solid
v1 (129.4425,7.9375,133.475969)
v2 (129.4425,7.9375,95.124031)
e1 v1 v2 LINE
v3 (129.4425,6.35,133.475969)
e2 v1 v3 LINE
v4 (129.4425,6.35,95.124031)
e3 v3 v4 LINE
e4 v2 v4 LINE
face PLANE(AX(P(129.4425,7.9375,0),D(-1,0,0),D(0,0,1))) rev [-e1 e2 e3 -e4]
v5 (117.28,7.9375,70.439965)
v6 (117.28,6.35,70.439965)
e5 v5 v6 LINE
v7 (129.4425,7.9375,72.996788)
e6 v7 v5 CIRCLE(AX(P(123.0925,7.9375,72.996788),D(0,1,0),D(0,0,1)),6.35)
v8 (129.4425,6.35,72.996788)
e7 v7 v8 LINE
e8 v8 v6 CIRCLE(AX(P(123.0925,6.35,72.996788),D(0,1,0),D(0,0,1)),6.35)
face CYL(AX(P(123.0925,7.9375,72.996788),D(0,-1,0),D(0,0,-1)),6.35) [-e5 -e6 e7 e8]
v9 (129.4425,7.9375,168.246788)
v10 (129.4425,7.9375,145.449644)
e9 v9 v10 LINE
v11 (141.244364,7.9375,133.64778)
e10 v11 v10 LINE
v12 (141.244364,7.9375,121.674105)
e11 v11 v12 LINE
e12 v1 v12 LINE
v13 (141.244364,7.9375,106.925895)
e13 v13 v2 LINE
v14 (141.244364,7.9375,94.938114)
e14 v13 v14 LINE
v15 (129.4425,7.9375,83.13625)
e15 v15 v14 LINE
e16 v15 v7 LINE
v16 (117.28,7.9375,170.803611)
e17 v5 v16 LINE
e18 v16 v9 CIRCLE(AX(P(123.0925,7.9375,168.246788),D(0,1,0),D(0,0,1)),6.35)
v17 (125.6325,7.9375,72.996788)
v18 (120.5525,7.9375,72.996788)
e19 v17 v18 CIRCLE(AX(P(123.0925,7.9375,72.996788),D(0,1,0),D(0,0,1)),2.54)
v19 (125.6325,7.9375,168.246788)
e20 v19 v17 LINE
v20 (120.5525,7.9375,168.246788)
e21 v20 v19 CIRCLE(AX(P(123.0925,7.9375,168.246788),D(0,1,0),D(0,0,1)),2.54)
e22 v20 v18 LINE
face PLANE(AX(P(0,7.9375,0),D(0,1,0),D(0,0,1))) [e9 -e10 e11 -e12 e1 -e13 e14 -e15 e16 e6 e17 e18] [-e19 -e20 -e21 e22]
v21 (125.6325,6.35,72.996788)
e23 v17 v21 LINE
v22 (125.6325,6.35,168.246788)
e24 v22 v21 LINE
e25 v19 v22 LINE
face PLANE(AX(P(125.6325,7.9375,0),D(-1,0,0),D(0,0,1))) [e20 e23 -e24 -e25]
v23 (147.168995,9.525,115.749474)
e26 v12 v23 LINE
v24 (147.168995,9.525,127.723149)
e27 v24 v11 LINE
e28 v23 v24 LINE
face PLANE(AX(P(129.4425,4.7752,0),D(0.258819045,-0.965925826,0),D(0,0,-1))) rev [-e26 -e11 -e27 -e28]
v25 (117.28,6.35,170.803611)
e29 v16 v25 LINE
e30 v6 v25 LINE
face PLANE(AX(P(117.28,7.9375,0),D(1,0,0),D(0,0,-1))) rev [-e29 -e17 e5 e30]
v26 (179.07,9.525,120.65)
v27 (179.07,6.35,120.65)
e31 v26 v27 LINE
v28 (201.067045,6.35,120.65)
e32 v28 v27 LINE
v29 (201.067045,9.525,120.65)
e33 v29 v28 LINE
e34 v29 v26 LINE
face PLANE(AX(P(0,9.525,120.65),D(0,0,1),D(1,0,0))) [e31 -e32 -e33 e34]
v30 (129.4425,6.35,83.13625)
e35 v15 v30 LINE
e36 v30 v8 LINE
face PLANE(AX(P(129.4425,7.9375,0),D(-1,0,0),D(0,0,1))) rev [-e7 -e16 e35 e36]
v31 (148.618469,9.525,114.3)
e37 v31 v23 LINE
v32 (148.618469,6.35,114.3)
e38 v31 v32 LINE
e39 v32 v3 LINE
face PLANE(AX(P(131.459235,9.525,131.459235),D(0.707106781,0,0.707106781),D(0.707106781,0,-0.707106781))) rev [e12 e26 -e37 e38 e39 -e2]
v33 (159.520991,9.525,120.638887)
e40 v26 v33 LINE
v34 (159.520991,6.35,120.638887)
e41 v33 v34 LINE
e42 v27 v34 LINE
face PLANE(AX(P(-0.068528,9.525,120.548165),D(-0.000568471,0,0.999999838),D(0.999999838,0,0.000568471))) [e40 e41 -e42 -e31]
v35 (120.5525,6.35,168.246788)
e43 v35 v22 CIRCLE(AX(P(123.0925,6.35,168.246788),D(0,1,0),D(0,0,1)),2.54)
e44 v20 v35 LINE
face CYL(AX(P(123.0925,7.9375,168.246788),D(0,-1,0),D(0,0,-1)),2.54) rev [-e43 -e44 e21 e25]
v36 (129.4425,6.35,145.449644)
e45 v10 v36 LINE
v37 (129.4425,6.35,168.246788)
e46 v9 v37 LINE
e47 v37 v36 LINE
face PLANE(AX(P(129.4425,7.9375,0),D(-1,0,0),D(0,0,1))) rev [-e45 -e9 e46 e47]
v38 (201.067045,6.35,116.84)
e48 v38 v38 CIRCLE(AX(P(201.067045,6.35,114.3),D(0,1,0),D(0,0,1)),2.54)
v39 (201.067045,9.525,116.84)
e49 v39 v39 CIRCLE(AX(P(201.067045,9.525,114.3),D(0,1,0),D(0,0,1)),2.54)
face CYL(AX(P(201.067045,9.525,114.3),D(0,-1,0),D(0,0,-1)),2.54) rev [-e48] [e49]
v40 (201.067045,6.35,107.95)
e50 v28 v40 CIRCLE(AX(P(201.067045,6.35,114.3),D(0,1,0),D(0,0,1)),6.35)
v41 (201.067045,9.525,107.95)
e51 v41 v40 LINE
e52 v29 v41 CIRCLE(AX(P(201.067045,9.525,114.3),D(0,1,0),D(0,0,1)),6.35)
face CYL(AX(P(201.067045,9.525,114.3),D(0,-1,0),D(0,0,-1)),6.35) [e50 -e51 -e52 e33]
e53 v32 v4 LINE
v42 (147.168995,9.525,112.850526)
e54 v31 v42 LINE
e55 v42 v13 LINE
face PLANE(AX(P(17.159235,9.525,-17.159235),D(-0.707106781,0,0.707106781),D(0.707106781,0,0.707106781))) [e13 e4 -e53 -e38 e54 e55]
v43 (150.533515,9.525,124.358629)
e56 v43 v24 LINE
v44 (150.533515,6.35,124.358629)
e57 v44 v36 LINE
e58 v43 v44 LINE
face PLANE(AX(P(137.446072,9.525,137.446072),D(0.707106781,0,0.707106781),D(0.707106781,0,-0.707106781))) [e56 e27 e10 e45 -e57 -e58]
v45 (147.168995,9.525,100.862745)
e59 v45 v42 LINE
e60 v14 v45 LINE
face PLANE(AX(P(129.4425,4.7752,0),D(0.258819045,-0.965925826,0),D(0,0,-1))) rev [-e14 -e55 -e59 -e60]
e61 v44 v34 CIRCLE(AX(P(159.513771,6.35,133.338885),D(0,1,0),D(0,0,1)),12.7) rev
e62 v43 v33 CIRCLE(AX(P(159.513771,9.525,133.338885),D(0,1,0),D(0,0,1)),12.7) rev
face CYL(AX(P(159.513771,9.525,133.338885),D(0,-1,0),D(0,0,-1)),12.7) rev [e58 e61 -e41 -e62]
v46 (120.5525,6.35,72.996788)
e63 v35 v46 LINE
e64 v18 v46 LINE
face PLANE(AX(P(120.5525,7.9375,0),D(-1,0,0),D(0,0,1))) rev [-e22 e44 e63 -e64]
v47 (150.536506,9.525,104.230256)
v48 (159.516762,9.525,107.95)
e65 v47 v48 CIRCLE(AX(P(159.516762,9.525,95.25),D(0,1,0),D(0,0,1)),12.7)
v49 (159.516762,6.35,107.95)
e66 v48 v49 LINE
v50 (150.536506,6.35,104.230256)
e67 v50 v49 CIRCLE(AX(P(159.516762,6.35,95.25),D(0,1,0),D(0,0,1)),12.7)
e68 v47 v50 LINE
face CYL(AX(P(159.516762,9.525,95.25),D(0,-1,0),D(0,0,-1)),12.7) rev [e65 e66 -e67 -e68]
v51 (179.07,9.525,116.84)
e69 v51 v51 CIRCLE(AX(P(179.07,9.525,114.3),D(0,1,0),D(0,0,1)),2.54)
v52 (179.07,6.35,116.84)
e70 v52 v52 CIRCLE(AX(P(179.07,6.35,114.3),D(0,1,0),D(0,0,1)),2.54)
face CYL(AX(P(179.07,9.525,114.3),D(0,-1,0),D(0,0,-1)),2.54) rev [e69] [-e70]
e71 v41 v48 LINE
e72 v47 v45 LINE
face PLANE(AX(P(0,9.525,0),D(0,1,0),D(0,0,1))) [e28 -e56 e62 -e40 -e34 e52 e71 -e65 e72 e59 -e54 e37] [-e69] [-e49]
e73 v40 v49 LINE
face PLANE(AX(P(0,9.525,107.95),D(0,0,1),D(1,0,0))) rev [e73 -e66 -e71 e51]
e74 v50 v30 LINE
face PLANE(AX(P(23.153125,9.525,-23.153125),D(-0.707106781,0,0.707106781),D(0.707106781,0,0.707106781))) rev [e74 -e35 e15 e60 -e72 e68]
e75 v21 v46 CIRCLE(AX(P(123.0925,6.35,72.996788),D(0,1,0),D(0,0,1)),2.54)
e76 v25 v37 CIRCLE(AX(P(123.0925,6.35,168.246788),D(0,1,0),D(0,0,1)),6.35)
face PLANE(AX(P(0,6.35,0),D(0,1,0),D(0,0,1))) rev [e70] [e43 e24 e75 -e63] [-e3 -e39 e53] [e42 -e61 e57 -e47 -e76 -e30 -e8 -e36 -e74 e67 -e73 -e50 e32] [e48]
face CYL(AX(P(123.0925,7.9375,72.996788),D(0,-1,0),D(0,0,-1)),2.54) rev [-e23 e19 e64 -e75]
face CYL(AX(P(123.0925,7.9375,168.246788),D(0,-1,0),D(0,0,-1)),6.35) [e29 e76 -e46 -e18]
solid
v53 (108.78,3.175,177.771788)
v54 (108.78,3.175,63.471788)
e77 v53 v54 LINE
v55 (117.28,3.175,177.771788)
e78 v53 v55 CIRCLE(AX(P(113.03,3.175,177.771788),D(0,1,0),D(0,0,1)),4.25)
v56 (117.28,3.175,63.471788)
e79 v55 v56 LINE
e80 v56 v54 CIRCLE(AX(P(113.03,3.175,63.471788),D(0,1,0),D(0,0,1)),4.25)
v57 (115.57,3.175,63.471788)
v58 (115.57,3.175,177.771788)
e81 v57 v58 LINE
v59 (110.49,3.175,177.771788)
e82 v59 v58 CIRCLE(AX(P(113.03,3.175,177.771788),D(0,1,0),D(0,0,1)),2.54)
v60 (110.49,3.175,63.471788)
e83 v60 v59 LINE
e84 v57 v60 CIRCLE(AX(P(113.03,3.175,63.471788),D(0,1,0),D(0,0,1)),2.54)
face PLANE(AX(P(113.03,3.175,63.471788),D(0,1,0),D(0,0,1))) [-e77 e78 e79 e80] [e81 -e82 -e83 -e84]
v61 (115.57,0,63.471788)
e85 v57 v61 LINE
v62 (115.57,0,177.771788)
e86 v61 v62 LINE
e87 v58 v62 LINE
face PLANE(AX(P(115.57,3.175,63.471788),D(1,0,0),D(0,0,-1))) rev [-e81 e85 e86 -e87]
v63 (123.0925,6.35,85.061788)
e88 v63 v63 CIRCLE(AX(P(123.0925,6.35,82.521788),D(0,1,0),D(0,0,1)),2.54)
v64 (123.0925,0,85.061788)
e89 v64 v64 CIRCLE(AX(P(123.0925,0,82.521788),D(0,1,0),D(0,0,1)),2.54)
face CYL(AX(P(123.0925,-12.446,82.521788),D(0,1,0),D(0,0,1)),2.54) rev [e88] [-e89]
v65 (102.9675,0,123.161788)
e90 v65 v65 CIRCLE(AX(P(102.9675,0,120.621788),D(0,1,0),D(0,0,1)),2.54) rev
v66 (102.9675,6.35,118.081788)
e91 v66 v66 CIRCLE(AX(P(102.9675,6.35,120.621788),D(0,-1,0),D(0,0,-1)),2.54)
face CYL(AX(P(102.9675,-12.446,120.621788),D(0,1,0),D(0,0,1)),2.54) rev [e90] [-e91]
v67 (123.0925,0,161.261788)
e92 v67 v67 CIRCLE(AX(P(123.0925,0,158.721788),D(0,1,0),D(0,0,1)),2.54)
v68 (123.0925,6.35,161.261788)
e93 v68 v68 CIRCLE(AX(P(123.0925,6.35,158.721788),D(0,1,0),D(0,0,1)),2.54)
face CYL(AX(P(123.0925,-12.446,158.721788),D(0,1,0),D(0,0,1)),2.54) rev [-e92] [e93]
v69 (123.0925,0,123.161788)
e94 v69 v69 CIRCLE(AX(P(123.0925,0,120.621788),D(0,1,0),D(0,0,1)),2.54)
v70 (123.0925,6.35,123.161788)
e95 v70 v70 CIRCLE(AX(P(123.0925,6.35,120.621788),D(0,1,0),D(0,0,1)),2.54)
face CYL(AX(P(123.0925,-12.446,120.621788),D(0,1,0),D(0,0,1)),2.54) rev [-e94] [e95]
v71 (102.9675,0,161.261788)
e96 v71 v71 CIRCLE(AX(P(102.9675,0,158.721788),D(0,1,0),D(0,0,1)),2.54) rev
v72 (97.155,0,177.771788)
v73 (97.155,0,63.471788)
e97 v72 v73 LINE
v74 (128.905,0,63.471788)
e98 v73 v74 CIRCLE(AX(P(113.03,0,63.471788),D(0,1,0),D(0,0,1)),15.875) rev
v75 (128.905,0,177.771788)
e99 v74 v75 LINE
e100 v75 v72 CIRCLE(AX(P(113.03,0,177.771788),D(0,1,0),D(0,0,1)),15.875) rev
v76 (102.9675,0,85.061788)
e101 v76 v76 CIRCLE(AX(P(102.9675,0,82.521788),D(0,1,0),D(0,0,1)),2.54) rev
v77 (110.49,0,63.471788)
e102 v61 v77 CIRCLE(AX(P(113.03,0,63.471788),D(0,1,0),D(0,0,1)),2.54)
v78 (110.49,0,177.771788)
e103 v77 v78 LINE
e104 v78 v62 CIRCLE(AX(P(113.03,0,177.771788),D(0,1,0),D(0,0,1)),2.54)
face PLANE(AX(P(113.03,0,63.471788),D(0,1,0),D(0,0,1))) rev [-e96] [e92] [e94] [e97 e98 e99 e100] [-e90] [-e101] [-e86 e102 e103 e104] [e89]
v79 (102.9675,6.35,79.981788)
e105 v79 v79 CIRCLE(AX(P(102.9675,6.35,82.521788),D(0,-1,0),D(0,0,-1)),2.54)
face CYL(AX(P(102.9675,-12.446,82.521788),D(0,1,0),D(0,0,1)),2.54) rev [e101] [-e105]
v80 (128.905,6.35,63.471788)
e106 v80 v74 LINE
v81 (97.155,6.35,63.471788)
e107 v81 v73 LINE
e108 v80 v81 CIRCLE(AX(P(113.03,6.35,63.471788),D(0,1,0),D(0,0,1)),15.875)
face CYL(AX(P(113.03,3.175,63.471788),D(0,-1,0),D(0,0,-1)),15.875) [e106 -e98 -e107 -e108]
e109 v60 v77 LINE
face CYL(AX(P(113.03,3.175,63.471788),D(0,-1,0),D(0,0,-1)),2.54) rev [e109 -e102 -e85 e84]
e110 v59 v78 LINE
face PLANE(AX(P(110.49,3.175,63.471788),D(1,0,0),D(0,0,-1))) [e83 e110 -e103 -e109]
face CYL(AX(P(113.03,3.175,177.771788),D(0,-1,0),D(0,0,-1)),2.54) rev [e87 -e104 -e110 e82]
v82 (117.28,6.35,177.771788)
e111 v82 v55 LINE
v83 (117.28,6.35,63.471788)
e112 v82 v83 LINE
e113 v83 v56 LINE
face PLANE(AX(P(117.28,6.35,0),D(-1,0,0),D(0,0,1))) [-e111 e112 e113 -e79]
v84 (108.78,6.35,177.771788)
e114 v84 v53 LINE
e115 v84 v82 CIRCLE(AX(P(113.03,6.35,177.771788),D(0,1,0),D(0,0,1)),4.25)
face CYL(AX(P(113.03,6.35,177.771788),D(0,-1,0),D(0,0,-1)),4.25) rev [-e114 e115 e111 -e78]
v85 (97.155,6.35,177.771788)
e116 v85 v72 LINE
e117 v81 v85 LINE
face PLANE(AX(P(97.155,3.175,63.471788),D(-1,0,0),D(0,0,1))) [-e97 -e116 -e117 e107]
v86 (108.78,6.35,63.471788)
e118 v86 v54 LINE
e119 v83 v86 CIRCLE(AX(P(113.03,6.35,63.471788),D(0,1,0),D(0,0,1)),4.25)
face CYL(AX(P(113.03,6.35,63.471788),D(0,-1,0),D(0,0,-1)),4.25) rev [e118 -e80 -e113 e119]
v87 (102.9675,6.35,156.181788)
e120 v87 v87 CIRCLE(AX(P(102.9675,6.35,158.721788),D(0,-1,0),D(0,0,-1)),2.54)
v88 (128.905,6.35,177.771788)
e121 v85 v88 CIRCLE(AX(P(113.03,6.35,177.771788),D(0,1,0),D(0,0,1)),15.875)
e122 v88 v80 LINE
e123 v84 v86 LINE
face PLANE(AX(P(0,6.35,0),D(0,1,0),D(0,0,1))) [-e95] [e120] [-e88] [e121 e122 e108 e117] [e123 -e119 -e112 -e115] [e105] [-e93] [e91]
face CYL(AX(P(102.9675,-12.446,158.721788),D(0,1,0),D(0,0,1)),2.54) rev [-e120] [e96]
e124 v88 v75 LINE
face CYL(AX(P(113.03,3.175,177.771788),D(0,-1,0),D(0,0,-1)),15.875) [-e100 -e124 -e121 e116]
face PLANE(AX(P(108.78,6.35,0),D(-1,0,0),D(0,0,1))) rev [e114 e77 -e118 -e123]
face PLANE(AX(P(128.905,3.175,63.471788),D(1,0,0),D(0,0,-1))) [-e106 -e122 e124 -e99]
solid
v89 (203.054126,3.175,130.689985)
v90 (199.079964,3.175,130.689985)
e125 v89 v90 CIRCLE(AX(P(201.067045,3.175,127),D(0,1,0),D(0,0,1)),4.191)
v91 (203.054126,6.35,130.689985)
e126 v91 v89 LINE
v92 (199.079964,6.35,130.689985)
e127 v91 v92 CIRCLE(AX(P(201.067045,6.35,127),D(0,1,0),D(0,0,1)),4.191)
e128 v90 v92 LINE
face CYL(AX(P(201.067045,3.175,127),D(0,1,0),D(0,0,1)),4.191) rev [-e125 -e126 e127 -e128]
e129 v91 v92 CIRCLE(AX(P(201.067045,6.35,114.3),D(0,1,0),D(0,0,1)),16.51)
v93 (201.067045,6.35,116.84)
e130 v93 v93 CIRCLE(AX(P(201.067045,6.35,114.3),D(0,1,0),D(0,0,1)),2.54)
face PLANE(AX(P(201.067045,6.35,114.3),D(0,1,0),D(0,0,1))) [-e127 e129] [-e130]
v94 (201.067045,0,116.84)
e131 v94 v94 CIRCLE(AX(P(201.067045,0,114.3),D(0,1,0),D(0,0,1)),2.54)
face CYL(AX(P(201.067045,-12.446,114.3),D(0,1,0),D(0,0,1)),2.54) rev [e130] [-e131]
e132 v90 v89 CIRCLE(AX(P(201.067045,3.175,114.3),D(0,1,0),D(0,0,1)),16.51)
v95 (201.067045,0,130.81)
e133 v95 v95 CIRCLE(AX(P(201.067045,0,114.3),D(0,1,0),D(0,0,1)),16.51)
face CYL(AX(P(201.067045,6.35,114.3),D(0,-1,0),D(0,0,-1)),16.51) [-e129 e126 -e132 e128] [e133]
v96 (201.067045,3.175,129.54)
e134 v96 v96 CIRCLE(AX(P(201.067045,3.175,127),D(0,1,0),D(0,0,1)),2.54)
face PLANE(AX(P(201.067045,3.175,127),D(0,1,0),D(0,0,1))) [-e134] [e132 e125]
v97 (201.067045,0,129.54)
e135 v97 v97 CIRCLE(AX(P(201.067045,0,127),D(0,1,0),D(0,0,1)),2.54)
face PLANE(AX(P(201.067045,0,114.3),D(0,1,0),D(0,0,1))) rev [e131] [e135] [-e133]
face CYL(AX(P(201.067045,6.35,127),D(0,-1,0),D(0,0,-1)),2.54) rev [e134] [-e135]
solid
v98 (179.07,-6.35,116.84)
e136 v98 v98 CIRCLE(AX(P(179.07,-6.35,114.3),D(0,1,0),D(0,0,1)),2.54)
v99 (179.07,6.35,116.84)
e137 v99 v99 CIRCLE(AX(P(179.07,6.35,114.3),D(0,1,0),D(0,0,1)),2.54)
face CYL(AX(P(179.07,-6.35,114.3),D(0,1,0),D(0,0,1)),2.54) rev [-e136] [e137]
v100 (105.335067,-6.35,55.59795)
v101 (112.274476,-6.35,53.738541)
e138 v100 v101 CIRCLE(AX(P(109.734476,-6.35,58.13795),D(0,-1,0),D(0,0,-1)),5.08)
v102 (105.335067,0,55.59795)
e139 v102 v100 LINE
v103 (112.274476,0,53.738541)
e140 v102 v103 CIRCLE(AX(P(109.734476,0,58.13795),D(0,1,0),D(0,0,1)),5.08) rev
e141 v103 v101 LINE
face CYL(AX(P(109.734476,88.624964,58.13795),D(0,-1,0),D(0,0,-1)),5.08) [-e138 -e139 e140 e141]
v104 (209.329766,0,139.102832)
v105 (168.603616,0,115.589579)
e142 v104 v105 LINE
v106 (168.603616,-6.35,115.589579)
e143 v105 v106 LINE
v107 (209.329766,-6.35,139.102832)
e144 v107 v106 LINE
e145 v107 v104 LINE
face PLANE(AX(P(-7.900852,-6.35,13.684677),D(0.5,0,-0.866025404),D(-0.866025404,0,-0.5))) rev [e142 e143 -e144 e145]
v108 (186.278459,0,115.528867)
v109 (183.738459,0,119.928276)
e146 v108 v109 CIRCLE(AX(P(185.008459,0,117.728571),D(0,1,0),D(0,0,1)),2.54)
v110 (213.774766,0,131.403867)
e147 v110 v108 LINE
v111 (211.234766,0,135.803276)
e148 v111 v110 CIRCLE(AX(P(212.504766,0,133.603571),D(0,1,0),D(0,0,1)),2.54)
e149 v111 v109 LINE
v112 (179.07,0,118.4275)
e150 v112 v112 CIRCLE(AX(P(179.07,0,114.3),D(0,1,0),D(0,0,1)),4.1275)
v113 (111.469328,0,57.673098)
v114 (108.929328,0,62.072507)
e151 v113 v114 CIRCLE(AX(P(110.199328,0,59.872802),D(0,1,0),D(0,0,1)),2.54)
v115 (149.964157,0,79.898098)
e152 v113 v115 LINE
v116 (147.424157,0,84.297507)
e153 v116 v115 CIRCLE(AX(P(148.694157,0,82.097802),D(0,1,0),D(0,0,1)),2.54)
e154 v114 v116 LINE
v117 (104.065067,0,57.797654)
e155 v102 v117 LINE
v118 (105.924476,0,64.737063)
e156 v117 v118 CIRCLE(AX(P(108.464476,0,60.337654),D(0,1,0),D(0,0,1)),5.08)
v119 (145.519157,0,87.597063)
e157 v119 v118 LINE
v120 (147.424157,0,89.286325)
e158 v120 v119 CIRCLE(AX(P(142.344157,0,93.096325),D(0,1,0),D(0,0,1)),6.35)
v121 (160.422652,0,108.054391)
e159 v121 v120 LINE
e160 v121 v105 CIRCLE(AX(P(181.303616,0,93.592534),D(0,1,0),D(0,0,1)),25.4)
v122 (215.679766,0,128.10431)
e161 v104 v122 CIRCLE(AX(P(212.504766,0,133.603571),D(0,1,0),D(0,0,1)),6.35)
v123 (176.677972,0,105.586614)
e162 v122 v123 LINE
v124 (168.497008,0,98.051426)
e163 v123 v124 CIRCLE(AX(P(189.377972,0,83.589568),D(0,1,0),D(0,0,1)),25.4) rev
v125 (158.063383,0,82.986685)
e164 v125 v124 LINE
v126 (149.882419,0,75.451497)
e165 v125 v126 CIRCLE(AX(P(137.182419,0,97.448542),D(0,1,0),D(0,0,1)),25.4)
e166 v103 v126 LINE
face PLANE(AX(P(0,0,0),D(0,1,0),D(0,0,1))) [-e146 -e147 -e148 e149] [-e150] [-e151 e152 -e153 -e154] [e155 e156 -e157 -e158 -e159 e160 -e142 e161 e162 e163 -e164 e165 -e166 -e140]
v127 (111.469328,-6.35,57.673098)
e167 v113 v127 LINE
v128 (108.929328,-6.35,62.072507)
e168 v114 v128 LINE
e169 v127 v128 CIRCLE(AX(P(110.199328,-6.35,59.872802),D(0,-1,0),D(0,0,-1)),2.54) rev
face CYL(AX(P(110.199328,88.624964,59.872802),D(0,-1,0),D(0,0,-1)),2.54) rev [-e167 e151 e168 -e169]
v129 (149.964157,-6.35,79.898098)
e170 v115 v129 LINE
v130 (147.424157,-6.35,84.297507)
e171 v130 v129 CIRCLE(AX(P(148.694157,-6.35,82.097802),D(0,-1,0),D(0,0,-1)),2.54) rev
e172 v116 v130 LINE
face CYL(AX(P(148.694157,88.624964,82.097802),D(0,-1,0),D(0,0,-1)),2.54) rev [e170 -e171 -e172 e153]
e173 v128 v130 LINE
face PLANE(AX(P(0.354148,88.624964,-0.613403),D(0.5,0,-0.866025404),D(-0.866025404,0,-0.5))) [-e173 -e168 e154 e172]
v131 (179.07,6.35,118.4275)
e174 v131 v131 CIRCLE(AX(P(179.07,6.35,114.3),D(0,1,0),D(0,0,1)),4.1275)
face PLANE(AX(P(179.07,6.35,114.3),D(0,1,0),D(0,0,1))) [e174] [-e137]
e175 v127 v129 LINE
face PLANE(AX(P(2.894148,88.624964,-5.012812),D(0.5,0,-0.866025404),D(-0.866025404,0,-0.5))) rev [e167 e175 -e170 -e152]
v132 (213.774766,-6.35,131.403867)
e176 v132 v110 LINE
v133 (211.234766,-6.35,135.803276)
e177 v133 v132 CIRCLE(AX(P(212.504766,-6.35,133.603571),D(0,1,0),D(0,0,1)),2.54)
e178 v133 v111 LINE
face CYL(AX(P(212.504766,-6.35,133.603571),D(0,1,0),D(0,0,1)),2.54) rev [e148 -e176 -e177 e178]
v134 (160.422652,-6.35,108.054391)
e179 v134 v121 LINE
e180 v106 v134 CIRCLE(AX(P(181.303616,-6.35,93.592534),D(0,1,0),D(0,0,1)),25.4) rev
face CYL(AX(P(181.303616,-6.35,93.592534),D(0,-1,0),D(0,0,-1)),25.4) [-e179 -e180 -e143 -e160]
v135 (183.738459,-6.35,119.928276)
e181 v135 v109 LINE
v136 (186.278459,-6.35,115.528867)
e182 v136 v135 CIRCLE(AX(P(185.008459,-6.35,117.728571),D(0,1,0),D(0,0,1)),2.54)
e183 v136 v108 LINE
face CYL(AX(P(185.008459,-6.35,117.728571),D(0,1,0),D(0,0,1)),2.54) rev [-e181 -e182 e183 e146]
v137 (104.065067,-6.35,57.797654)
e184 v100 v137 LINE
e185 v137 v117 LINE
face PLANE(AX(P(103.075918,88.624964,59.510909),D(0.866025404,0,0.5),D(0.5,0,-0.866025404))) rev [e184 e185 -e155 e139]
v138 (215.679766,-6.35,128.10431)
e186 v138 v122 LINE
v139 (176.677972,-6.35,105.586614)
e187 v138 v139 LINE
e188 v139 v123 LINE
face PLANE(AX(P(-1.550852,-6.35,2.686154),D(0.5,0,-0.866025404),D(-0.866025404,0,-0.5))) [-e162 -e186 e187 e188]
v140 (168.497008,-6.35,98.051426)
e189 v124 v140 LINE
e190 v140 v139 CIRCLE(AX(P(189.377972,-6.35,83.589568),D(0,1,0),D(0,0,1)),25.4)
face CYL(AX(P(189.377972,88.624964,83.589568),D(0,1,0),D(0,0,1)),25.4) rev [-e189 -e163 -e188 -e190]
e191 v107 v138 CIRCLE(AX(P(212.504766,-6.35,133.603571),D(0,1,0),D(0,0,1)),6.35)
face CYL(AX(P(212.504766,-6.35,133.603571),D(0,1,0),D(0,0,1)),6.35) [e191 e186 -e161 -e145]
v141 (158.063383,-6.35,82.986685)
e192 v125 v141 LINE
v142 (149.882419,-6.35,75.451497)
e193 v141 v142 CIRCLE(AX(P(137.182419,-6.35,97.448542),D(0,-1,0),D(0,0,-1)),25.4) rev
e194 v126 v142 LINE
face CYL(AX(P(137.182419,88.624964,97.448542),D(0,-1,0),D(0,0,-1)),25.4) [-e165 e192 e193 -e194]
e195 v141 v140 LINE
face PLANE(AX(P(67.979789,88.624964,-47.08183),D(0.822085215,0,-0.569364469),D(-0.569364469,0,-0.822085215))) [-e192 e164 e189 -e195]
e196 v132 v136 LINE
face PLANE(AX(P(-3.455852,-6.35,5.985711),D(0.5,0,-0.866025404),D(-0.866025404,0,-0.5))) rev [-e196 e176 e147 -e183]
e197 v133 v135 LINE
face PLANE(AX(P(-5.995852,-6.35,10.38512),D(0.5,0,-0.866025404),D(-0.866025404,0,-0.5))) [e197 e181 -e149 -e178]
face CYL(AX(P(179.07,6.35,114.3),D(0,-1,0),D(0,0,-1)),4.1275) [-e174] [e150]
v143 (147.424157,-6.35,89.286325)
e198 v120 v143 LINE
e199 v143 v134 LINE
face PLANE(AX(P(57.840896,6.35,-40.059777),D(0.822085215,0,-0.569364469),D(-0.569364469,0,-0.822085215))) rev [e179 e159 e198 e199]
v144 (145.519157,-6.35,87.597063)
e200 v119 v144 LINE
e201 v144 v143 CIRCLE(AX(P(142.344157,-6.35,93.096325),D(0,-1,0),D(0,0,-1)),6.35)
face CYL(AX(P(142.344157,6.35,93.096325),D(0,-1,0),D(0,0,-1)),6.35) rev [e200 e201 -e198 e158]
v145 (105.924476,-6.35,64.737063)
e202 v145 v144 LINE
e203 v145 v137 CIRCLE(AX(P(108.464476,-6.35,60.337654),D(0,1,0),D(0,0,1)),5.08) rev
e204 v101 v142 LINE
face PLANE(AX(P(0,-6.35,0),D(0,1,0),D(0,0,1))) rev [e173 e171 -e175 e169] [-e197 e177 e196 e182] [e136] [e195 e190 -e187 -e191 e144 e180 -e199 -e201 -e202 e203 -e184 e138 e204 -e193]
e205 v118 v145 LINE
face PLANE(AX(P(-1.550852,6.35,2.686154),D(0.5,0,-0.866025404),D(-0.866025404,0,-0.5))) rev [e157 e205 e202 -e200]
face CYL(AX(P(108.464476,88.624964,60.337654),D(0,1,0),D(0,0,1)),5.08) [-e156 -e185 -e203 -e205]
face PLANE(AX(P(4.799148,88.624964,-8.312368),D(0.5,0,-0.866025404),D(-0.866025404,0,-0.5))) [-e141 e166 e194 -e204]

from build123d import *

# Parameters (mm, degrees)
SKETCH8_R                = 16.51
SKETCH8_R_2              = 2.54
BOSS_EXTRUDE1_DEPTH      = 6.35
SKETCH8_3_R              = 2.54
BOSS_EXTRUDE2_DEPTH      = 6.35
BOSS_EXTRUDE3_DEPTH      = 3.175
BOSS_EXTRUDE5_DEPTH      = 6.35
CUT_EXTRUDE1_DEPTH       = 289.337970876
FILLET3_R                = 5.08
FILLET4_R                = 25.4
BOSS_EXTRUDE6_DEPTH      = 3.175
BOSS_EXTRUDE6_DEPTH_BACK = 3.175
BOSS_EXTRUDE7_DEPTH      = 3.175
CUT_EXTRUDE3_DEPTH       = 3.175
SKETCH16_R               = 4.1275
SKETCH16_R_2             = 2.54
BOSS_EXTRUDE8_DEPTH      = 6.35
SKETCH17_R               = 2.54
CUT_EXTRUDE4_DEPTH       = 18.796
SKETCH18_R               = 2.54
CUT_EXTRUDE5_DEPTH       = 18.796
BOSS_EXTRUDE9_OUTLINE_R  = 2.54
BOSS_EXTRUDE9_DEPTH      = 3.175
BOSS_EXTRUDE10_DEPTH     = 1.5875
CHAMFER3_SIZE            = 17.726494926
CHAMFER3_SIZE_2          = 4.7498
SKETCH20_R               = 4.191
CUT_EXTRUDE6_DEPTH       = 3.175


# Read off the part's stored shape, not the designer's step: Boss-Extrude9
with BuildPart() as part:
    # Sketch8 → Boss-Extrude1 (new body)
    with BuildSketch(Plane(origin=(0, 0, 0), x_dir=(1, 0, 0), z_dir=(0, 1, 0))):
        with Locations(Location((201.067045256, -114.3, 0), (0, 0, 270))):
            Circle(SKETCH8_R)
        with Locations(Location((201.067045256, -127, 0), (0, 0, 270))):
            Circle(SKETCH8_R_2, mode=Mode.SUBTRACT)
    extrude(amount=BOSS_EXTRUDE1_DEPTH)

    # Sketch17 → Cut-Extrude4 (cut)
    with BuildSketch(Plane(origin=(0, 6.35, 0), x_dir=(1, 0, 0), z_dir=(0, 1, 0))):
        with Locations(Location((201.067045256, -114.3, 0), (0, 0, 270))):
            Circle(SKETCH17_R)
    extrude(amount=-CUT_EXTRUDE4_DEPTH, mode=Mode.SUBTRACT)

    # Sketch20 → Cut-Extrude6 (cut)
    with BuildSketch(Plane(origin=(0, 6.35, 0), x_dir=(1, 0, 0), z_dir=(0, 1, 0))):
        with Locations((201.067045256, -127)):
            Circle(SKETCH20_R)
    extrude(amount=-CUT_EXTRUDE6_DEPTH, mode=Mode.SUBTRACT)


with BuildPart() as body_2:
    # Sketch8<3> → Boss-Extrude2 (new body)
    with BuildSketch(Plane(origin=(0, 0, 0), x_dir=(1, 0, 0), z_dir=(0, 1, 0))):
        with BuildLine():
            ThreePointArc((209.32976593, -139.102832424), (218.004027244, -136.77857111), (215.67976593, -128.104309796))
            Line((215.67976593, -128.104309796), (110.754602918, -67.525738686))
            ThreePointArc((110.754602918, -67.525738686), (102.080341604, -69.85), (104.404602918, -78.524261314))
            Line((104.404602918, -78.524261314), (209.32976593, -139.102832424))
        make_face()
        with BuildLine():
            ThreePointArc((213.77476593, -131.403866584), (214.704470456, -134.87357111), (211.23476593, -135.803275636))
            Line((211.23476593, -135.803275636), (183.73845936, -119.928275636))
            ThreePointArc((183.73845936, -119.928275636), (182.808754834, -116.45857111), (186.27845936, -115.528866584))
            Line((186.27845936, -115.528866584), (213.77476593, -131.403866584))
        make_face(mode=Mode.SUBTRACT)
        with Locations(Location((179.07, -114.3, 0), (0, 0, 270))):
            Circle(SKETCH8_3_R, mode=Mode.SUBTRACT)
    extrude(amount=-BOSS_EXTRUDE2_DEPTH)

    # Sketch9 → Boss-Extrude5 (add)
    with BuildSketch(Plane.XZ.offset(6.35)):
        with BuildLine():
            Line((158.063383303, 82.98668464), (171.74208472, 102.736877722))
            Line((171.74208472, 102.736877722), (110.754602918, 67.525738686))
            ThreePointArc((110.754602918, 67.525738686), (105.936101981, 66.891371003), (102.080341604, 69.85))
            Line((102.080341604, 69.85), (98.350066501, 67.696324666))
            Line((98.350066501, 67.696324666), (105.335066501, 55.597949775))
            ThreePointArc((105.335066501, 55.597949775), (108.419674804, 53.231046577), (112.274475553, 53.738540724))
            Line((112.274475553, 53.738540724), (149.882418833, 75.4514969))
            ThreePointArc((149.882418833, 75.4514969), (154.390412826, 78.765797637), (158.063383303, 82.98668464))
        make_face()
        with BuildLine():
            Line((108.929327815, 62.072506563), (147.424157014, 84.297506563))
            ThreePointArc((147.424157014, 84.297506563), (150.893861539, 83.367802038), (149.964157014, 79.898097512))
            Line((149.964157014, 79.898097512), (111.469327815, 57.673097512))
            ThreePointArc((111.469327815, 57.673097512), (107.99962329, 58.602802038), (108.929327815, 62.072506563))
        make_face(mode=Mode.SUBTRACT)
    extrude(amount=-BOSS_EXTRUDE5_DEPTH)

    # Sketch10 → Cut-Extrude1 (cut, through all)
    with BuildSketch(Plane.XZ.offset(6.35)):
        with BuildLine():
            Line((163.667728403, 112.739842766), (104.404602918, 78.524261314))
            ThreePointArc((104.404602918, 78.524261314), (101.445973921, 74.668500936), (102.080341604, 69.85))
            Line((102.080341604, 69.85), (98.350066501, 67.696324666))
            Line((98.350066501, 67.696324666), (101.525066501, 62.197063352))
            Line((101.525066501, 62.197063352), (145.519157014, 87.597063352))
            ThreePointArc((145.519157014, 87.597063352), (146.557191217, 88.345236074), (147.424157014, 89.286324666))
            Line((147.424157014, 89.286324666), (163.667728403, 112.739842766))
        make_face()
    extrude(amount=-CUT_EXTRUDE1_DEPTH, mode=Mode.SUBTRACT)

    # Fillet3
    fillet3_edges = [body_2.edges().sort_by_distance(p)[0] for p in [
        (101.525066501, -3.175, 62.197063352),
    ]]
    fillet(fillet3_edges, radius=FILLET3_R)

    # Fillet4
    fillet4_edges = [body_2.edges().sort_by_distance(p)[0] for p in [
        (163.667728403, -3.175, 112.739842766),
        (171.74208472, -3.175, 102.736877722),
    ]]
    fillet(fillet4_edges, radius=FILLET4_R)

    # Sketch16 → Boss-Extrude8 (add)
    with BuildSketch(Plane(origin=(0, 0, 0), x_dir=(1, 0, 0), z_dir=(0, 1, 0))):
        with Locations(Location((179.07, -114.3, 0), (0, 0, 270))):
            Circle(SKETCH16_R)
        with Locations(Location((179.07, -114.3, 0), (0, 0, 270))):
            Circle(SKETCH16_R_2, mode=Mode.SUBTRACT)
    extrude(amount=BOSS_EXTRUDE8_DEPTH)


with BuildPart() as body_3:
    # Sketch8<4> → Boss-Extrude3 (new body)
    with BuildSketch(Plane(origin=(0, 0, 0), x_dir=(1, 0, 0), z_dir=(0, 1, 0))):
        with BuildLine():
            Line((122.555, -63.471788223), (122.555, -177.771788223))
            ThreePointArc((122.555, -177.771788223), (113.03, -187.296788223), (103.505, -177.771788223))
            Line((103.505, -177.771788223), (103.505, -63.471788223))
            ThreePointArc((103.505, -63.471788223), (113.03, -53.946788223), (122.555, -63.471788223))
        make_face()
        with BuildLine():
            Line((115.57, -63.471788223), (115.57, -177.771788223))
            ThreePointArc((115.57, -177.771788223), (113.03, -180.311788223), (110.49, -177.771788223))
            Line((110.49, -177.771788223), (110.49, -63.471788223))
            ThreePointArc((110.49, -63.471788223), (113.03, -60.931788223), (115.57, -63.471788223))
        make_face(mode=Mode.SUBTRACT)
    extrude(amount=BOSS_EXTRUDE3_DEPTH)

    # Sketch12 → Boss-Extrude6 (add, two sides: drawn at the far end of the back side and taken through both)
    with BuildSketch(Plane.XZ.offset(-BOSS_EXTRUDE6_DEPTH_BACK)):
        with BuildLine():
            Line((97.155, 63.471788223), (97.155, 177.771788223))
            ThreePointArc((97.155, 177.771788223), (113.03, 193.646788223), (128.905, 177.771788223))
            Line((128.905, 177.771788223), (128.905, 63.471788223))
            ThreePointArc((128.905, 63.471788223), (113.03, 47.596788223), (97.155, 63.471788223))
        make_face()
        with BuildLine():
            Line((122.555, 63.471788223), (122.555, 177.771788223))
            ThreePointArc((122.555, 177.771788223), (113.03, 187.296788223), (103.505, 177.771788223))
            Line((103.505, 177.771788223), (103.505, 63.471788223))
            ThreePointArc((103.505, 63.471788223), (113.03, 53.946788223), (122.555, 63.471788223))
        make_face(mode=Mode.SUBTRACT)
    extrude(amount=BOSS_EXTRUDE6_DEPTH + BOSS_EXTRUDE6_DEPTH_BACK)

    # Sketch13 → Boss-Extrude7 (add)
    with BuildSketch(Plane(origin=(0, 3.175, 0), x_dir=(1, 0, 0), z_dir=(0, 1, 0))):
        with BuildLine():
            Line((128.905, -177.771788223), (128.905, -63.471788223))
            ThreePointArc((128.905, -63.471788223), (113.03, -47.596788223), (97.155, -63.471788223))
            Line((97.155, -63.471788223), (97.155, -177.771788223))
            ThreePointArc((97.155, -177.771788223), (113.03, -193.646788223), (128.905, -177.771788223))
        make_face()
        with BuildLine():
            ThreePointArc((117.28, -63.471788223), (113.03, -59.221788223), (108.78, -63.471788223))
            Line((108.78, -63.471788223), (108.78, -177.771788223))
            ThreePointArc((108.78, -177.771788223), (113.03, -182.021788223), (117.28, -177.771788223))
            Line((117.28, -177.771788223), (117.28, -63.471788223))
        make_face(mode=Mode.SUBTRACT)
    extrude(amount=BOSS_EXTRUDE7_DEPTH)

    # Sketch15 → Cut-Extrude3 (cut)
    with BuildSketch(Plane.XZ.offset(3.175)):
        with BuildLine():
            Line((128.905, 63.471788223), (128.905, 177.771788223))
            ThreePointArc((128.905, 177.771788223), (113.03, 193.646788223), (97.155, 177.771788223))
            Line((97.155, 177.771788223), (97.155, 63.471788223))
            ThreePointArc((97.155, 63.471788223), (113.03, 47.596788223), (128.905, 63.471788223))
        make_face()
    extrude(amount=-CUT_EXTRUDE3_DEPTH, mode=Mode.SUBTRACT)

    # Sketch18 → Cut-Extrude5 (cut)
    with BuildSketch(Plane(origin=(0, 6.35, 0), x_dir=(1, 0, 0), z_dir=(0, 1, 0))):
        with Locations(Location((123.0925, -158.721788223, 0), (0, 0, 270))):
            Circle(SKETCH18_R)
        with Locations(Location((123.0925, -82.521788223, 0), (0, 0, 270))):
            Circle(SKETCH18_R)
        with Locations(Location((123.0925, -120.621788223, 0), (0, 0, 270))):
            Circle(SKETCH18_R)
        with Locations(Location((102.9675, -82.521788223, 0), (0, 0, 270))):
            Circle(SKETCH18_R)
        with Locations(Location((102.9675, -120.621788223, 0), (0, 0, 270))):
            Circle(SKETCH18_R)
        with Locations(Location((102.9675, -158.721788223, 0), (0, 0, 270))):
            Circle(SKETCH18_R)
    extrude(amount=-CUT_EXTRUDE5_DEPTH, mode=Mode.SUBTRACT)


with BuildPart() as body_4:
    # Boss-Extrude9 outline → Boss-Extrude9 (new body)
    with BuildSketch(Plane(origin=(0, 6.35, 0), x_dir=(1, 0, 0), z_dir=(0, 1, 0))):
        with BuildLine():
            Line((201.067045256, -107.95), (159.516762242, -107.95))
            ThreePointArc((159.516762242, -107.95), (154.656682651, -106.983270063), (150.536506121, -104.230256121))
            Line((150.536506121, -104.230256121), (129.4425, -83.13625))
            Line((129.4425, -83.13625), (129.4425, -95.124030717))
            Line((129.4425, -95.124030717), (148.618469283, -114.3))
            Line((148.618469283, -114.3), (129.4425, -133.475969283))
            Line((129.4425, -133.475969283), (129.4425, -145.449644111))
            Line((129.4425, -145.449644111), (150.533515322, -124.358628789))
            ThreePointArc((150.533515322, -124.358628789), (154.657027058, -121.604233915), (159.52099102, -120.638886962))
            Line((159.52099102, -120.638886962), (179.07, -120.65))
            Line((179.07, -120.65), (201.067045256, -120.65))
            ThreePointArc((201.067045256, -120.65), (207.417045256, -114.3), (201.067045256, -107.95))
        make_face()
        with Locations((179.07, -114.3)):
            Circle(BOSS_EXTRUDE9_OUTLINE_R, mode=Mode.SUBTRACT)
        with Locations((201.067045256, -114.3)):
            Circle(BOSS_EXTRUDE9_OUTLINE_R, mode=Mode.SUBTRACT)
    extrude(amount=BOSS_EXTRUDE9_DEPTH)

    # Sketch19<3> → Boss-Extrude10 (add)
    # profile 1 of 2: a face of its own
    with BuildSketch(Plane(origin=(0, 6.35, 0), x_dir=(1, 0, 0), z_dir=(0, 1, 0))):
        with BuildLine():
            Line((117.28, -70.439965243), (117.28, -170.803611203))
            ThreePointArc((117.28, -170.803611203), (123.0925, -174.596788223), (128.905, -170.803611203))
            Line((128.905, -170.803611203), (128.905, -70.439965243))
            ThreePointArc((128.905, -70.439965243), (123.0925, -66.646788223), (117.28, -70.439965243))
        make_face()
        with BuildLine():
            ThreePointArc((125.6325, -168.246788223), (123.0925, -170.786788223), (120.5525, -168.246788223))
            Line((120.5525, -168.246788223), (120.5525, -158.721788223))
            Line((120.5525, -158.721788223), (120.5525, -120.621788223))
            Line((120.5525, -120.621788223), (120.5525, -82.521788223))
            Line((120.5525, -82.521788223), (120.5525, -72.996788223))
            ThreePointArc((120.5525, -72.996788223), (123.0925, -70.456788223), (125.6325, -72.996788223))
            Line((125.6325, -72.996788223), (125.6325, -82.521788223))
            Line((125.6325, -82.521788223), (125.6325, -120.621788223))
            Line((125.6325, -120.621788223), (125.6325, -158.721788223))
            Line((125.6325, -158.721788223), (125.6325, -168.246788223))
        make_face(mode=Mode.SUBTRACT)
    # profile 2 of 2: a face of its own
    with BuildSketch(Plane(origin=(0, 6.35, 0), x_dir=(1, 0, 0), z_dir=(0, 1, 0))):
        with BuildLine():
            Line((128.905, -70.439965243), (128.905, -170.803611203))
            ThreePointArc((128.905, -170.803611203), (129.30667231, -169.553142884), (129.4425, -168.246788223))
            Line((129.4425, -168.246788223), (129.4425, -145.449644111))
            Line((129.4425, -145.449644111), (129.4425, -133.475969283))
            Line((129.4425, -133.475969283), (129.4425, -95.124030717))
            Line((129.4425, -95.124030717), (129.4425, -83.13625))
            Line((129.4425, -83.13625), (129.4425, -72.996788223))
            ThreePointArc((129.4425, -72.996788223), (129.30667231, -71.690433562), (128.905, -70.439965243))
        make_face()
    extrude(amount=BOSS_EXTRUDE10_DEPTH)

    # Chamfer3
    # the kernel refuses this chamfer: 17.726494926, 4.7498 mm, written as the material it adds along each edge
    # the kernel refuses this chamfer: 17.726494926, 4.7498 mm, written as the material it takes off along each edge
    with BuildSketch(Plane(origin=(129.4425, 9.525, 37.105478262), x_dir=(0.9999503267608394, 0.009967146577156326, 0), z_dir=(0, 0, 1))) as chamfer3_2_piece_1_section:
        Polygon((CHAMFER3_SIZE * 0.999950326749, -CHAMFER3_SIZE * 0.00996714657704), (-CHAMFER3_SIZE_2 * 0.00996714657716, -CHAMFER3_SIZE_2 * 0.999950326761), (0, 0), align=None)
    chamfer3_2_piece_1 = extrude(amount=104.049324193, mode=Mode.PRIVATE)
    chamfer3_2_piece_1 = split(chamfer3_2_piece_1, bisect_by=Plane(origin=(136.923650638, 7.9375, 96.611290996), z_dir=(0, 1, 0)), keep=Keep.TOP, mode=Mode.PRIVATE)
    add(chamfer3_2_piece_1, mode=Mode.SUBTRACT)
    with BuildSketch(Plane(origin=(129.4425, 9.525, 87.445197545), x_dir=(0.9999503267608394, 0.009967146577156326, 0), z_dir=(0, 0, 1))) as chamfer3_2_piece_2_section:
        Polygon((CHAMFER3_SIZE * 0.999950326749, -CHAMFER3_SIZE * 0.00996714657704), (-CHAMFER3_SIZE_2 * 0.00996714657716, -CHAMFER3_SIZE_2 * 0.999950326761), (0, 0), align=None)
    chamfer3_2_piece_2 = extrude(amount=104.035218304, mode=Mode.PRIVATE)
    chamfer3_2_piece_2 = split(chamfer3_2_piece_2, bisect_by=Plane(origin=(137.258267367, 7.9375, 97.198195957), z_dir=(0, 1, 0)), keep=Keep.TOP, mode=Mode.PRIVATE)
    add(chamfer3_2_piece_2, mode=Mode.SUBTRACT)


solid = Compound([part.part, body_2.part, body_3.part, body_4.part])
